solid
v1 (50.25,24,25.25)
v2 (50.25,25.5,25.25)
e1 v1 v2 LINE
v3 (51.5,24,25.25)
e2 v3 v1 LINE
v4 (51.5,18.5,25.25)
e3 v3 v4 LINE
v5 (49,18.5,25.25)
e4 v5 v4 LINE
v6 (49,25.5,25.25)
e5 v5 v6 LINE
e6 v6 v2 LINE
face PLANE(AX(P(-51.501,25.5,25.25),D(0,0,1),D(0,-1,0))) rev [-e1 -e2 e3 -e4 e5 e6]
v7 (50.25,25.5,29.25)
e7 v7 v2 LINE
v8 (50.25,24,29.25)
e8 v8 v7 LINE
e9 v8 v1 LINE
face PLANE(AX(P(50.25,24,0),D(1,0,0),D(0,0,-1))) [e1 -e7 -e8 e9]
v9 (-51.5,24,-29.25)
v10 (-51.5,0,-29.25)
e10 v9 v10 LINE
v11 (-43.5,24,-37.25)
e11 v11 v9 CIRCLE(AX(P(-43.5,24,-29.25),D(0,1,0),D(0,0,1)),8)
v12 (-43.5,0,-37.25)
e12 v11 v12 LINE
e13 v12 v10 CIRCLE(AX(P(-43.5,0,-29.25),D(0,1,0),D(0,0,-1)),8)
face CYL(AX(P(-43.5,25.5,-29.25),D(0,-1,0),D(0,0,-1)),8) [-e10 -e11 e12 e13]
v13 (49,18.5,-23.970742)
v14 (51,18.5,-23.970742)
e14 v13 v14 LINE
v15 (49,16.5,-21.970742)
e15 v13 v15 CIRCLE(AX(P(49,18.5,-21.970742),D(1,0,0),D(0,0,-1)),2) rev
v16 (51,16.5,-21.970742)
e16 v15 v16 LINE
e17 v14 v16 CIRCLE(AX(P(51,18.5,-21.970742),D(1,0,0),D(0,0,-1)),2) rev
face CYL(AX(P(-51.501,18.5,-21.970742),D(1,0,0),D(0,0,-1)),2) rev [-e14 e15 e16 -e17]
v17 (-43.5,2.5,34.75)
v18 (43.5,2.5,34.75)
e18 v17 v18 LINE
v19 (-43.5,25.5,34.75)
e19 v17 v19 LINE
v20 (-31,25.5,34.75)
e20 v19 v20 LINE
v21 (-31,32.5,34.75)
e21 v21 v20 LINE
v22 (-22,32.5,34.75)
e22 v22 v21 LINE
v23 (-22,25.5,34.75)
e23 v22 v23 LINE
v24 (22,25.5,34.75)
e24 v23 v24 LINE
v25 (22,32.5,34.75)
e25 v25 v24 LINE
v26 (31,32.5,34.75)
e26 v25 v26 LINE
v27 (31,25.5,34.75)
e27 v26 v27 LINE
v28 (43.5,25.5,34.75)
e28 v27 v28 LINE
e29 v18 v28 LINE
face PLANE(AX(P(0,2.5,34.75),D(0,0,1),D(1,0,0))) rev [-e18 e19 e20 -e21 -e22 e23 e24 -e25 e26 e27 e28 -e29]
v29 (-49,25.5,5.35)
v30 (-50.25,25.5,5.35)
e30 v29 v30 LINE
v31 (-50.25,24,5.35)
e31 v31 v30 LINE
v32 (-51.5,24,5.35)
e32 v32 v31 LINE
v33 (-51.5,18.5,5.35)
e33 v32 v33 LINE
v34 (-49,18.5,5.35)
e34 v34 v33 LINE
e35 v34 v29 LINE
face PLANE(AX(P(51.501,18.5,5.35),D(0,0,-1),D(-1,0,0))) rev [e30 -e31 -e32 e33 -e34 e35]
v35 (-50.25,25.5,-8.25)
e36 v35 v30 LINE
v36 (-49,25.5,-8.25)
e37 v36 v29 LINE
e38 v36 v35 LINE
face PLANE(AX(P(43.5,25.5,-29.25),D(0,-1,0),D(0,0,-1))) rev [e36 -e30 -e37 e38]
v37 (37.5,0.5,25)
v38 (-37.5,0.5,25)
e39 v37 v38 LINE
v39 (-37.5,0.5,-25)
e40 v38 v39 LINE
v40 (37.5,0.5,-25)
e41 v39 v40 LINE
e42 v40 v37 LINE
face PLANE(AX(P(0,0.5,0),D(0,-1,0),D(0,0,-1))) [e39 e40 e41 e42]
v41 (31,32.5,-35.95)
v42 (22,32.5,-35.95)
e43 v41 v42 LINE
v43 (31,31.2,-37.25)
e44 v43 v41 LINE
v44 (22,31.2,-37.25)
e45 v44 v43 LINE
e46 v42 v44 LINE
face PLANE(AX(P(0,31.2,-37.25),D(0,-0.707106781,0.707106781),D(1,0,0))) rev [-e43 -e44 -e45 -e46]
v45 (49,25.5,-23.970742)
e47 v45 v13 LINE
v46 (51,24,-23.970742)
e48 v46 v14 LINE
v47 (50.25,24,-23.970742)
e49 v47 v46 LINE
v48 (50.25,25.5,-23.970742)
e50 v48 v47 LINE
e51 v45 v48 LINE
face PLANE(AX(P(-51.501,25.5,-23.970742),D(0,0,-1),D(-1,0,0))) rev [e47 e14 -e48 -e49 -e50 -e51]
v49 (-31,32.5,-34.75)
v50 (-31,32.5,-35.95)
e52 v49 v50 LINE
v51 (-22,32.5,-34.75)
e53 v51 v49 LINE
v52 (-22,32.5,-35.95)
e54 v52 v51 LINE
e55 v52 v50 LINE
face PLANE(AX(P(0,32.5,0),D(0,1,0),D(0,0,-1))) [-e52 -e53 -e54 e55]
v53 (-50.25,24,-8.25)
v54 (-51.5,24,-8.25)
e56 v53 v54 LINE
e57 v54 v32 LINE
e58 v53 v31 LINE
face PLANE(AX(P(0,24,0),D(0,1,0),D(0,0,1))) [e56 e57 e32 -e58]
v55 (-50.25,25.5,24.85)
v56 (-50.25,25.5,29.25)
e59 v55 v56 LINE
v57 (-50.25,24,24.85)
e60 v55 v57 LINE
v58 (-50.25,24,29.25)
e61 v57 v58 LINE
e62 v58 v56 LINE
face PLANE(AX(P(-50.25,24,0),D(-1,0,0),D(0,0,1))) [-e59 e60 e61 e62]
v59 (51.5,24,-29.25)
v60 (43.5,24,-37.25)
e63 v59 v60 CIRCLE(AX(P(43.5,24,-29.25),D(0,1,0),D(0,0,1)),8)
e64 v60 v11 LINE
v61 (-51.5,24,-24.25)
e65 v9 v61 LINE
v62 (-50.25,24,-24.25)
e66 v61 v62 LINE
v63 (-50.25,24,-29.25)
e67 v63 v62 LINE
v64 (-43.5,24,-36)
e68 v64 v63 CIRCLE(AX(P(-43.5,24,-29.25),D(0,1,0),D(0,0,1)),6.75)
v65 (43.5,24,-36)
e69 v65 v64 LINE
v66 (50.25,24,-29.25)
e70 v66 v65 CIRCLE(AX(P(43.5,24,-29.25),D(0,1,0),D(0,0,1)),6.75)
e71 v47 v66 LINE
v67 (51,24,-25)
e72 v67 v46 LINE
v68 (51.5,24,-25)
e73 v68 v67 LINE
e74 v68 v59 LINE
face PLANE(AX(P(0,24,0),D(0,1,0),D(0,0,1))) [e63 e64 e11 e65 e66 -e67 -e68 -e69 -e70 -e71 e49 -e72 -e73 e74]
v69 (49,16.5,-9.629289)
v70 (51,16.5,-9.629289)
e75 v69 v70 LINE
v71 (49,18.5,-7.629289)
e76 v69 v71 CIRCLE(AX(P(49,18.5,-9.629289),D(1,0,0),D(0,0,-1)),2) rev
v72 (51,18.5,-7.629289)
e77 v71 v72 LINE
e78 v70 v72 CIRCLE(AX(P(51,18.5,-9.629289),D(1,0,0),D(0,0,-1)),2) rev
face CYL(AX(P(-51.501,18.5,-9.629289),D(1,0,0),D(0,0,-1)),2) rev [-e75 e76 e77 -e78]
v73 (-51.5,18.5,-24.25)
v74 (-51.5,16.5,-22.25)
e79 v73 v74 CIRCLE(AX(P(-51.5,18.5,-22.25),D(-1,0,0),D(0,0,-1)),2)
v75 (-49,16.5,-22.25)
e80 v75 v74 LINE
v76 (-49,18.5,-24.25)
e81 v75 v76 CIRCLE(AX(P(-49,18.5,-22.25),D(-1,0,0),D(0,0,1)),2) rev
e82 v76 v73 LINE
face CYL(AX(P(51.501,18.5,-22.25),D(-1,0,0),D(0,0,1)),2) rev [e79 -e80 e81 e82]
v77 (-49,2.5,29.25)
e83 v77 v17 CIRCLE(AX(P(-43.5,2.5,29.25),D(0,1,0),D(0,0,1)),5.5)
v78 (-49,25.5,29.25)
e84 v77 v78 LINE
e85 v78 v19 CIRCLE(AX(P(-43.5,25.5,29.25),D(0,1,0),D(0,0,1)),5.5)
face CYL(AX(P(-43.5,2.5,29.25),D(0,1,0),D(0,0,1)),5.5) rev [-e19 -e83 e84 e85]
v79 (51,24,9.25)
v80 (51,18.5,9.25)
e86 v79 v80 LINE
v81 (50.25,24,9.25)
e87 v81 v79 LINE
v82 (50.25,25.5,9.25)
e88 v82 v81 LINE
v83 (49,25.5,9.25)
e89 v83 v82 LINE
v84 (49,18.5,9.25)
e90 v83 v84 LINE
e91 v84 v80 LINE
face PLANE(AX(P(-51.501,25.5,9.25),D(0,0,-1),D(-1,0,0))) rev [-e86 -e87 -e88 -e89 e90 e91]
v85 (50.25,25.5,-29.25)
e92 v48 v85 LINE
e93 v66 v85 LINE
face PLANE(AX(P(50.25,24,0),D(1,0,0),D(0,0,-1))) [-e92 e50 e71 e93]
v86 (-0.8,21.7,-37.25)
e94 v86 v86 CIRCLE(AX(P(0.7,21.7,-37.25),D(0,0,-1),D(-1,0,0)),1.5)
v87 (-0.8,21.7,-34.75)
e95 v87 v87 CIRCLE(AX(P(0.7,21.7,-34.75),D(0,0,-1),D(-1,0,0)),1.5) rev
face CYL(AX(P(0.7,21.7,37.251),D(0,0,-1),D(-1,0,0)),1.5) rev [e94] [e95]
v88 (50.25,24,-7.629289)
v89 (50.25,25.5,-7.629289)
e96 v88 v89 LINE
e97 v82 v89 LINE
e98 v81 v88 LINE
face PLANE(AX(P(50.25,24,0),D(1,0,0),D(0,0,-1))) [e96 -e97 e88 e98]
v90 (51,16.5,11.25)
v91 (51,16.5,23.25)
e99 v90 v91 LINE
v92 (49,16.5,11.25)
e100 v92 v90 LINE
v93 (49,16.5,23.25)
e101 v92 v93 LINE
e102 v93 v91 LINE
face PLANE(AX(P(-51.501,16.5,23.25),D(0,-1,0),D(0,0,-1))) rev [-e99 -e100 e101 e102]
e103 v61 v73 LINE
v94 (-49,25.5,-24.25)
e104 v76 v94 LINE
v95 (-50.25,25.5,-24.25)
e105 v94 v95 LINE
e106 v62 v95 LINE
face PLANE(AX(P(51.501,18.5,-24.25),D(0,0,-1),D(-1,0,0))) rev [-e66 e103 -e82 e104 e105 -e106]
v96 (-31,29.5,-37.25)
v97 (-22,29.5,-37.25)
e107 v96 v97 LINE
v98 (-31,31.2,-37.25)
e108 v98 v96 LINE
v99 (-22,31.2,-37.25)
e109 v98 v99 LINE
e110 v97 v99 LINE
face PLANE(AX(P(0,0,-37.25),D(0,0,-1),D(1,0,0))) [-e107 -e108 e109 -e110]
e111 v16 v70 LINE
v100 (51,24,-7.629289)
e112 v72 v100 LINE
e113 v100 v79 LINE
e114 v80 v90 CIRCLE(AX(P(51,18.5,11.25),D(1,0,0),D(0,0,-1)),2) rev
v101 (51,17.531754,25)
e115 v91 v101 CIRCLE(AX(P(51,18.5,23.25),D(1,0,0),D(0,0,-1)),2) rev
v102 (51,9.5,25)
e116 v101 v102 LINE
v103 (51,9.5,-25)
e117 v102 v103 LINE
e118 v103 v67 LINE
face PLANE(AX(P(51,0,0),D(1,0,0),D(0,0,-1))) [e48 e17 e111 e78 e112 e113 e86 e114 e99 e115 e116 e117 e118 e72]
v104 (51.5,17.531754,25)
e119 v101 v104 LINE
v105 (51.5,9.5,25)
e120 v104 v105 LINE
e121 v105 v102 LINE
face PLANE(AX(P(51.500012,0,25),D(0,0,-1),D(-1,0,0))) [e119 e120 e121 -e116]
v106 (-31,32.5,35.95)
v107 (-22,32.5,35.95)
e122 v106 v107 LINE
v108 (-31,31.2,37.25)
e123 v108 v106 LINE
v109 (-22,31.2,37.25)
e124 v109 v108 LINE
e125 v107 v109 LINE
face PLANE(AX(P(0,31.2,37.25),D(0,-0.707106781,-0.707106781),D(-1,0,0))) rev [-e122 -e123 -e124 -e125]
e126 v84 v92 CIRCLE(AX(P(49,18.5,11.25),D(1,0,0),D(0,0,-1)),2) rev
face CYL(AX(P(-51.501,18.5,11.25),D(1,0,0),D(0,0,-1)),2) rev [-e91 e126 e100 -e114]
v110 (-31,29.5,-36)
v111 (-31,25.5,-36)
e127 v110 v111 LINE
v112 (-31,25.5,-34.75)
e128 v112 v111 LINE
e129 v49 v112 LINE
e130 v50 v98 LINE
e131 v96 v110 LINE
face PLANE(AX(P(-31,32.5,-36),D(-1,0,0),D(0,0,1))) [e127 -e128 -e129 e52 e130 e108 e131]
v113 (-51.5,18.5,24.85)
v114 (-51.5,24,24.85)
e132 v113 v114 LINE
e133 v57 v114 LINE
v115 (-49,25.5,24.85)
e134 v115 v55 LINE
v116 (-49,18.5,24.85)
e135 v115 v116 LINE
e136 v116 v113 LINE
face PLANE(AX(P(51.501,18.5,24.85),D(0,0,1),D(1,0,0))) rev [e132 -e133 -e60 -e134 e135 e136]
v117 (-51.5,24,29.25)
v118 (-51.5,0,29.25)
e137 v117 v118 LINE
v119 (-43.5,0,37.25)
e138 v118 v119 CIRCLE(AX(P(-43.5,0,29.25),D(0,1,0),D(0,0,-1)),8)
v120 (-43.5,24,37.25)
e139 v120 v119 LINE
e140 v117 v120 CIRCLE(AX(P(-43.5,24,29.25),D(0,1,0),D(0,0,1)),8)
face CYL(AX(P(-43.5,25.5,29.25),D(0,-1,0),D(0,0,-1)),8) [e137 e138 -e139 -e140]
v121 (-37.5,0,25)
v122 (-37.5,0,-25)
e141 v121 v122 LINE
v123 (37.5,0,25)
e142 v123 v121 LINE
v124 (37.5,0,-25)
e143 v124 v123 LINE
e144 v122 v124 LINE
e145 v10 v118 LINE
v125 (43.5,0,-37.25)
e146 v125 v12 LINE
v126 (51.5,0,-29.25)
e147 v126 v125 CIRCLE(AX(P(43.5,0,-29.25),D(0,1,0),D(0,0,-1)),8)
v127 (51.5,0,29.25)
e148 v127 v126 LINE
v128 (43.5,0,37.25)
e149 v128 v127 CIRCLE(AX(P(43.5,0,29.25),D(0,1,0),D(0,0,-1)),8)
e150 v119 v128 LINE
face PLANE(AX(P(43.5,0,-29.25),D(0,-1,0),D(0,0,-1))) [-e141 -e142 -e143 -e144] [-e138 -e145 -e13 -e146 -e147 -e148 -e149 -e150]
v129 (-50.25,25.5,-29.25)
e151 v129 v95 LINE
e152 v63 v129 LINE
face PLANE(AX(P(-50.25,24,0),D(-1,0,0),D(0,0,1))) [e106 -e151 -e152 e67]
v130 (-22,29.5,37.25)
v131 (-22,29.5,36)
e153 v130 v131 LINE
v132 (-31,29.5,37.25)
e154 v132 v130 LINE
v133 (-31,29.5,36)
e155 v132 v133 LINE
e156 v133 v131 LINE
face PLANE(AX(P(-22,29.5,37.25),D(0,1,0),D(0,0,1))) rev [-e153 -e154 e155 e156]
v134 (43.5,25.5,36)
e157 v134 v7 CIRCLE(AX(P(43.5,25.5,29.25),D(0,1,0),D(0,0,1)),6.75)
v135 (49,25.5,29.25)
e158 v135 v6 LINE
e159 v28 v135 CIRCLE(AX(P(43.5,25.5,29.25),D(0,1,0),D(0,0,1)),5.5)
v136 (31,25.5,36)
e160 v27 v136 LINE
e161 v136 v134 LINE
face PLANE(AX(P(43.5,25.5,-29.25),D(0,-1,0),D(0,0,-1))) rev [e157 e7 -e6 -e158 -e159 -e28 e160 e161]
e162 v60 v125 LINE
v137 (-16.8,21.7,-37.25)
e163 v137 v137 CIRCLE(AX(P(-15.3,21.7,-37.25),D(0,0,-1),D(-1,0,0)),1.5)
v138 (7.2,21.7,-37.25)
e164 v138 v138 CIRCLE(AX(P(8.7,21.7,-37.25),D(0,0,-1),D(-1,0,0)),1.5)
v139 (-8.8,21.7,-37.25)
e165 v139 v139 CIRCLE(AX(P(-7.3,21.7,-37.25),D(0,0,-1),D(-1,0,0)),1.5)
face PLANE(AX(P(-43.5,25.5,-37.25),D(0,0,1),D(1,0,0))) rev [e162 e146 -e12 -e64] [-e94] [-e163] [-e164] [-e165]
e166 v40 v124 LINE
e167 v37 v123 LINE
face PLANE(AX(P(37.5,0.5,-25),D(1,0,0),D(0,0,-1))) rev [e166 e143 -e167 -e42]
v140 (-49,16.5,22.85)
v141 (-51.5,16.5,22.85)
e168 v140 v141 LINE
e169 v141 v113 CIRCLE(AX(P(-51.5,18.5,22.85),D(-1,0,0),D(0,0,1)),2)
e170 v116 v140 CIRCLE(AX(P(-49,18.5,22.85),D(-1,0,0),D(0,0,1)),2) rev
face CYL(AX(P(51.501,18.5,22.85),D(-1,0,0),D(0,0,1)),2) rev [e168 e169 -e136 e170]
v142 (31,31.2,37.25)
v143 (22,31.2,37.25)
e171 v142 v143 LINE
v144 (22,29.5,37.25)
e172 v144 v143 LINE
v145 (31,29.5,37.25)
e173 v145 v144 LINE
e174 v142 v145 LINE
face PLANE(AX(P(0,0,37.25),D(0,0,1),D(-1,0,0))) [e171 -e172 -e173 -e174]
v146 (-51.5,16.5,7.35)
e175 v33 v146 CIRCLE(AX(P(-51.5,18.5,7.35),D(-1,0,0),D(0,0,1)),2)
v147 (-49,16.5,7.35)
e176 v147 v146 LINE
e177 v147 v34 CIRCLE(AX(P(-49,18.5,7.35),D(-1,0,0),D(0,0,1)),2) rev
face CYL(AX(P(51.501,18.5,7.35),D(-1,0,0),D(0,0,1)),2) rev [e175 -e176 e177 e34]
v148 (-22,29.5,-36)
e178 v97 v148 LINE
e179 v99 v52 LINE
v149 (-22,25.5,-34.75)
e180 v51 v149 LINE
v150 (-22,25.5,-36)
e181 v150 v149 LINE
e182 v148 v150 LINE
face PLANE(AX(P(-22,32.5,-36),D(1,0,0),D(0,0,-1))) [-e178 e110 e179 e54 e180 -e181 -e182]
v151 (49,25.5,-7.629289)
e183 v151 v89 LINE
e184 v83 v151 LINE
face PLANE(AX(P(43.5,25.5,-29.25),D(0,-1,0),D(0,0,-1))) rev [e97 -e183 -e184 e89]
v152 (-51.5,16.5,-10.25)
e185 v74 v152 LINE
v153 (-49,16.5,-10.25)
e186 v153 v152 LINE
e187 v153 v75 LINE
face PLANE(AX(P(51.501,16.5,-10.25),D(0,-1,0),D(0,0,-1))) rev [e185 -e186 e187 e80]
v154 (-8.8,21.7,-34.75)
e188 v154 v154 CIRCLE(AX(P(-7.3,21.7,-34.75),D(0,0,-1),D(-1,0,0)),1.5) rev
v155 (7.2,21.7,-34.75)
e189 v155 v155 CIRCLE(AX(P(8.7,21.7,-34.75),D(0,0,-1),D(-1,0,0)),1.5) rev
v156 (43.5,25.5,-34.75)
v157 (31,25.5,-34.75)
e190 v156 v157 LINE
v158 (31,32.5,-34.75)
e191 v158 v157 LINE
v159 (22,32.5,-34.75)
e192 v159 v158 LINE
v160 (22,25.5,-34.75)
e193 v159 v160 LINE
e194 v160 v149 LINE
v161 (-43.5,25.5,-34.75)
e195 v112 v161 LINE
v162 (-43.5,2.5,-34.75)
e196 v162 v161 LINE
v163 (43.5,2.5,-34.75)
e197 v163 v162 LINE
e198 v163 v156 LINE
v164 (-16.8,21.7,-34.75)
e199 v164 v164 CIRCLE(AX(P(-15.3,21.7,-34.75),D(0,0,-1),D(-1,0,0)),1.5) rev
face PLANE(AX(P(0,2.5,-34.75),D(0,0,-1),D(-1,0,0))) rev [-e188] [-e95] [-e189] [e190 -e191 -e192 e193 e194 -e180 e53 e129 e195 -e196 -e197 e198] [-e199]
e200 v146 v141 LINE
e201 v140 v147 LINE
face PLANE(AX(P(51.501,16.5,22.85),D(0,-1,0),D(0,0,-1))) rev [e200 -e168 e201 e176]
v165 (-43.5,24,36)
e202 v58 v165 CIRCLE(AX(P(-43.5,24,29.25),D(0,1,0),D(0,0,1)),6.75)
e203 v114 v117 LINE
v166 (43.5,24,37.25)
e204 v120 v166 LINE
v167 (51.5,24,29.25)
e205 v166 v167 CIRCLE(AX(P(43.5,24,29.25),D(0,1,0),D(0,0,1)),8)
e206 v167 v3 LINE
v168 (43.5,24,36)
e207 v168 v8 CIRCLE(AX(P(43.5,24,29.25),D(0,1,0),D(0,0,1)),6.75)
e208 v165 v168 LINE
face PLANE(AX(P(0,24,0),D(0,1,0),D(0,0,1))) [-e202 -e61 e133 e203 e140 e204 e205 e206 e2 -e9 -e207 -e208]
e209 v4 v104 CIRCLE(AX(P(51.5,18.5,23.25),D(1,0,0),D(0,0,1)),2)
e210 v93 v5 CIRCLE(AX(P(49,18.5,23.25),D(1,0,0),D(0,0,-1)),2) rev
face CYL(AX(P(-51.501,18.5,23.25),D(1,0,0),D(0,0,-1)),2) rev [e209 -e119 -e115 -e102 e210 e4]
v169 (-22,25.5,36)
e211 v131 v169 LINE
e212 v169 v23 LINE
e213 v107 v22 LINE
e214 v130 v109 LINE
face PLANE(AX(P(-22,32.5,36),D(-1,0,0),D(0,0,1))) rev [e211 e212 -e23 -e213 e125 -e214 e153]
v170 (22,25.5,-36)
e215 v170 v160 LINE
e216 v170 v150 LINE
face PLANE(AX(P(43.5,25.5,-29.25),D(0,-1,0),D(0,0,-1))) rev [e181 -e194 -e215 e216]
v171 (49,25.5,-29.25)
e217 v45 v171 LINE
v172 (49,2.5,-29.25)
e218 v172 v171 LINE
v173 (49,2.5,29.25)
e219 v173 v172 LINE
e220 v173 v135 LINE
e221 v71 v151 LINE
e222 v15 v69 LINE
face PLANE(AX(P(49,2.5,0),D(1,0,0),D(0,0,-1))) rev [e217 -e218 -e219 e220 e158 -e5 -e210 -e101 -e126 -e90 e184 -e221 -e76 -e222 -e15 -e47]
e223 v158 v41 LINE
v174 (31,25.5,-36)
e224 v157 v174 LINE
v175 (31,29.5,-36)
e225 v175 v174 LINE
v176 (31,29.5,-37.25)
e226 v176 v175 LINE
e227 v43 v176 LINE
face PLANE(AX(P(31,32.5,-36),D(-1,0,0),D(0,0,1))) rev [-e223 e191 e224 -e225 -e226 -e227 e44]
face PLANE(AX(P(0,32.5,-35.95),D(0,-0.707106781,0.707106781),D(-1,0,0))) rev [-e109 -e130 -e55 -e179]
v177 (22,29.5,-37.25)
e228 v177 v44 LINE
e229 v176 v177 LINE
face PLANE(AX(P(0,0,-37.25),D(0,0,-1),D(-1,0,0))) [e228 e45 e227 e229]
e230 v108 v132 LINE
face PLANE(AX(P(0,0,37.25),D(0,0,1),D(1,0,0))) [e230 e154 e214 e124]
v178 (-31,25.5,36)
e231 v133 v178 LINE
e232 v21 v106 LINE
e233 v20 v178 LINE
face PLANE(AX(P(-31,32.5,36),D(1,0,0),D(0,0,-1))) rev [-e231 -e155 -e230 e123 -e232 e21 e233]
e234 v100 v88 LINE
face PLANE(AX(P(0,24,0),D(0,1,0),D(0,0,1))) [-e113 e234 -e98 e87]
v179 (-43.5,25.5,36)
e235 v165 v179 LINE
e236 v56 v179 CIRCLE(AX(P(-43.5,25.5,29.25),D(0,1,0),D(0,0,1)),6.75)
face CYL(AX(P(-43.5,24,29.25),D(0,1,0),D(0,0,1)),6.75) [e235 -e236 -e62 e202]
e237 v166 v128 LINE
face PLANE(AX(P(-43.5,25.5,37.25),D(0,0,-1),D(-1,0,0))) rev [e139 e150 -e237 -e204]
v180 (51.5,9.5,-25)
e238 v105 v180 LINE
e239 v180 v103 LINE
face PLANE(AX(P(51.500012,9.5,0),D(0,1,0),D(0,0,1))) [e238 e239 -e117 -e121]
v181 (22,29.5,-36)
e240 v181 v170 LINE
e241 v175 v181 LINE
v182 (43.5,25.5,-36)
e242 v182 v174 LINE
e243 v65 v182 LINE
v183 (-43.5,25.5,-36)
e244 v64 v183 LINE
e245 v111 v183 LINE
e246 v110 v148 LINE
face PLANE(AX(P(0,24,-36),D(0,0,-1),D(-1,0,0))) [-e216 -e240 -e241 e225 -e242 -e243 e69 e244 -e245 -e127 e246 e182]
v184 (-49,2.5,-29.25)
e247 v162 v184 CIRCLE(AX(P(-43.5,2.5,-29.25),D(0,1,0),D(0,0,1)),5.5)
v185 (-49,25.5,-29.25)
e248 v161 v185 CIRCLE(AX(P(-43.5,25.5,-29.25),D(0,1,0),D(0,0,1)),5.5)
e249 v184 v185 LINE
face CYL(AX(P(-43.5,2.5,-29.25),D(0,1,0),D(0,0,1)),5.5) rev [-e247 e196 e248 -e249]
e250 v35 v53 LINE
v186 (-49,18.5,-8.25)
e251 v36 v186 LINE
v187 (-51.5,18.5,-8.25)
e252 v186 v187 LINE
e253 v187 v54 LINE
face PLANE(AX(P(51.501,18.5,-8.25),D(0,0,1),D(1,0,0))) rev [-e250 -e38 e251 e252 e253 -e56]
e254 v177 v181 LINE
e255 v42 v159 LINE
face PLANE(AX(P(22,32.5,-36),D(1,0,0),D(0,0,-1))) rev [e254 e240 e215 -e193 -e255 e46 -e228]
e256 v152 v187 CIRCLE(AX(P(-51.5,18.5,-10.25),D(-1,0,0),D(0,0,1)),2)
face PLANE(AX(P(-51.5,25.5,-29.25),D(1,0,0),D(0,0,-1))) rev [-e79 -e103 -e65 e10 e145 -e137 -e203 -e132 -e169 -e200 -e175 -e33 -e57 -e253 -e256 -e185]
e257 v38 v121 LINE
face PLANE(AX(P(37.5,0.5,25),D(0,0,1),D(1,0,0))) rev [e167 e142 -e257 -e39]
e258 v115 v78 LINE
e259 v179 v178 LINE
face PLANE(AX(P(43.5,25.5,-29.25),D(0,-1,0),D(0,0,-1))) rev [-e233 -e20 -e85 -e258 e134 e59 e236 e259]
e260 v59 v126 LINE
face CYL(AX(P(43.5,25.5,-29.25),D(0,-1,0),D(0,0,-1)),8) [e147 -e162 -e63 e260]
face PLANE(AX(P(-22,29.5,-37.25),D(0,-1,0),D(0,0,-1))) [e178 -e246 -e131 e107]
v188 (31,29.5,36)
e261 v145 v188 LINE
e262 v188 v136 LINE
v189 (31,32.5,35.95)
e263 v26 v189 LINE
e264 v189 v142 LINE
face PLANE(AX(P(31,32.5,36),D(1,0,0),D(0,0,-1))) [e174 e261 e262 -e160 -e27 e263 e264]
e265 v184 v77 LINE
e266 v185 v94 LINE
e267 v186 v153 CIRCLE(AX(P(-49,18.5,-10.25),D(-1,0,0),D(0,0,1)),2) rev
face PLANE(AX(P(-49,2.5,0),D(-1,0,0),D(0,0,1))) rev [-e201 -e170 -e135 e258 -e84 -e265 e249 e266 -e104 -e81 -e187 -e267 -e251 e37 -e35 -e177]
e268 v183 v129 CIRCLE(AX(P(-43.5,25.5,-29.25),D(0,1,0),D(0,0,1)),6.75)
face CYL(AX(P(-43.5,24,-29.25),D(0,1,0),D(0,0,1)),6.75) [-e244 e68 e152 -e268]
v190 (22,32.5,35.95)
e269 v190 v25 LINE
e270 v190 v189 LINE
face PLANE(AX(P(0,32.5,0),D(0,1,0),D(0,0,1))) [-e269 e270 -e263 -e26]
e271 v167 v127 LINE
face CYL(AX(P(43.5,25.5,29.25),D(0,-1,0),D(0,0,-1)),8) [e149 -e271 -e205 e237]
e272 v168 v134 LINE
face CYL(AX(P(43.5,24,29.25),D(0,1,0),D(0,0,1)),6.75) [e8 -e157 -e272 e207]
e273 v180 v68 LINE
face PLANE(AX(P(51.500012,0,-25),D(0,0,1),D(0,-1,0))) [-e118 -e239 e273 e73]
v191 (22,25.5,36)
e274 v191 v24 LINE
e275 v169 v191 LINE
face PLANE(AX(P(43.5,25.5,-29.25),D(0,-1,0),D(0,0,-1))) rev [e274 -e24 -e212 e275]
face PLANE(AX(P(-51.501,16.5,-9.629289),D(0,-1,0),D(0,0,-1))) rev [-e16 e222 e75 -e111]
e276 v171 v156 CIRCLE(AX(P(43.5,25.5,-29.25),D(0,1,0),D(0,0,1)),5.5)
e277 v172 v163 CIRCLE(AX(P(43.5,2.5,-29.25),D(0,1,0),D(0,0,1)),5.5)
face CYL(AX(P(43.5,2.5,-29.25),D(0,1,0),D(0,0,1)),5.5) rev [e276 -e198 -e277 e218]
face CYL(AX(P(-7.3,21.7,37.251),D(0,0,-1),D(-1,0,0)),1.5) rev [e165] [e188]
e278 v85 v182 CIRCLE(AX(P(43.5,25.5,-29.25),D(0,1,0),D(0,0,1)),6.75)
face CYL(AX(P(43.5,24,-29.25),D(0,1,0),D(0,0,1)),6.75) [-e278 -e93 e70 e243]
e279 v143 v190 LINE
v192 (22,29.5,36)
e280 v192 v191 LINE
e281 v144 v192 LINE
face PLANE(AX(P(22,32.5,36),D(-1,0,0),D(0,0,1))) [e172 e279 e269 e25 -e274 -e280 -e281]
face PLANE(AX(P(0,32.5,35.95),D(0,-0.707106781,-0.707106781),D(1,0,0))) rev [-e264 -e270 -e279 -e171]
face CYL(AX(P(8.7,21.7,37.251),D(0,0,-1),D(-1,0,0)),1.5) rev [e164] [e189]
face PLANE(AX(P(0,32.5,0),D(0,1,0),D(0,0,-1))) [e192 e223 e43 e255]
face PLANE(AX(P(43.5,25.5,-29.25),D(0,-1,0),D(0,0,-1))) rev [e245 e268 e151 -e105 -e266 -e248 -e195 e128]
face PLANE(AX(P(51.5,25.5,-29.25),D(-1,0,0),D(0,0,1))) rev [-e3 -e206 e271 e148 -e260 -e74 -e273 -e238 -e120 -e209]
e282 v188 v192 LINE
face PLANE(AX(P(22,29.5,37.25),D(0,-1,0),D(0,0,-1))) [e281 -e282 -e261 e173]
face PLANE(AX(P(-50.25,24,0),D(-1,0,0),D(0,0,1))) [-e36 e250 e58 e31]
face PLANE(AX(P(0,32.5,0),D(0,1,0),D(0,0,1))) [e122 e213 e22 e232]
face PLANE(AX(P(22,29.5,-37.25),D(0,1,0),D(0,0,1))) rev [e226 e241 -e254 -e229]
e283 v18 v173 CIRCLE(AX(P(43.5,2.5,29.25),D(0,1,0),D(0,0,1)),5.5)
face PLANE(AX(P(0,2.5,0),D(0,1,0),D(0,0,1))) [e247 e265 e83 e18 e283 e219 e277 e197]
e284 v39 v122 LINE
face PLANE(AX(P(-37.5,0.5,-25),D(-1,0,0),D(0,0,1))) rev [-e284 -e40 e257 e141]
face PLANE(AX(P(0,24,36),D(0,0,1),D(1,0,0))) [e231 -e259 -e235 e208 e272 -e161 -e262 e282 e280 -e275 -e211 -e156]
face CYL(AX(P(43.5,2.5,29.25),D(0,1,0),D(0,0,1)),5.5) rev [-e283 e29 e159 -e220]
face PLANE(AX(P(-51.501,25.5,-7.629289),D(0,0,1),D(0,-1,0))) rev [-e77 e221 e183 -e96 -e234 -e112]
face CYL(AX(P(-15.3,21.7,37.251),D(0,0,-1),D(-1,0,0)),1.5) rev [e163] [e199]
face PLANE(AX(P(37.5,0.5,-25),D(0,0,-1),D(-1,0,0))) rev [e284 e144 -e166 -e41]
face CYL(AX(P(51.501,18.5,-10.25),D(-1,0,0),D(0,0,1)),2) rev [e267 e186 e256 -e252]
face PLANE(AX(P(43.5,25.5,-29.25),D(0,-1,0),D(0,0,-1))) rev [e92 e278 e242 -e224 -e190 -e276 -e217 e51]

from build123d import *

# Parameters (mm, degrees)
EXTRUDE_1_DEPTH            = 25.5
CUT_EXTRUDE_1_DEPTH        = 23
CUT_EXTRUDE_START          = -1.5
CUT_EXTRUDE_2_DEPTH        = 1.5
SKETCH_3_W                 = 9
SKETCH_3_H                 = 1.25
EXTRUDE_2_DEPTH            = 7
SKETCH_4_W                 = 9
SKETCH_4_H                 = 3
EXTRUDE_3_DEPTH            = 1.25
CHAMFER_1_SIZE             = 1.3
CHAMFER_1_OF_MIRROR_1_SIZE = 1.3
MIRROR_START               = -31
MIRROR_4_DEPTH             = 9
MIRROR_START_2             = 22
MIRROR_4_2_DEPTH           = 9
SKETCH_5_W                 = 75
SKETCH_5_H                 = 50
CUT_EXTRUDE_3_DEPTH        = 0.5
CUT_EXTRUDE_4_DEPTH        = 115.248905903
CUT_EXTRUDE_4_DEPTH_BACK   = 0.5
SKETCH_6_W                 = 50
SKETCH_6_H                 = 14.5
CUT_EXTRUDE_5_REACH        = 98.222
SKETCH_7_R                 = 1.5
CUT_EXTRUDE_6_REACH        = 116.249
CUT_EXTRUDE_7_REACH        = 116.249


# Read off the part's stored shape, not the designer's step: Зеркальное отражение4
with BuildPart() as part:
    # Эскиз1 → Бобышка-Вытянуть1 (new body)
    with BuildSketch(Plane(origin=(0, 0, 0), x_dir=(1, 0, 0), z_dir=(0, 1, 0))):
        with BuildLine():
            Line((-43.5, 37.25), (43.5, 37.25))
            ThreePointArc((43.5, 37.25), (49.156854249, 34.906854249), (51.5, 29.25))
            Line((51.5, 29.25), (51.5, -29.25))
            ThreePointArc((51.5, -29.25), (49.156854249, -34.906854249), (43.5, -37.25))
            Line((43.5, -37.25), (-43.5, -37.25))
            ThreePointArc((-43.5, -37.25), (-49.156854249, -34.906854249), (-51.5, -29.25))
            Line((-51.5, -29.25), (-51.5, 29.25))
            ThreePointArc((-51.5, 29.25), (-49.156854249, 34.906854249), (-43.5, 37.25))
        make_face()
    extrude(amount=EXTRUDE_1_DEPTH)

    # Эскиз2 → Вырез-Вытянуть1 (cut)
    with BuildSketch(Plane(origin=(0, 25.5, 0), x_dir=(1, 0, 0), z_dir=(0, 1, 0))):
        with BuildLine():
            Line((-49, 29.25), (-49, -29.25))
            ThreePointArc((-49, -29.25), (-47.389087297, -33.139087297), (-43.5, -34.75))
            Line((-43.5, -34.75), (43.5, -34.75))
            ThreePointArc((43.5, -34.75), (47.389087297, -33.139087297), (49, -29.25))
            Line((49, -29.25), (49, 29.25))
            ThreePointArc((49, 29.25), (47.389087297, 33.139087297), (43.5, 34.75))
            Line((43.5, 34.75), (-43.5, 34.75))
            ThreePointArc((-43.5, 34.75), (-47.389087297, 33.139087297), (-49, 29.25))
        make_face()
    extrude(amount=-CUT_EXTRUDE_1_DEPTH, mode=Mode.SUBTRACT)

    # Эскиз2<3> → Вырез-Вытянуть2 (cut)
    with BuildSketch(Plane(origin=(0, 25.5, 0), x_dir=(1, 0, 0), z_dir=(0, 1, 0)).offset(CUT_EXTRUDE_START)):
        with BuildLine():
            Line((51.5, -29.25), (51.5, 29.25))
            ThreePointArc((51.5, 29.25), (49.156854249, 34.906854249), (43.5, 37.25))
            Line((43.5, 37.25), (-43.5, 37.25))
            ThreePointArc((-43.5, 37.25), (-49.156854249, 34.906854249), (-51.5, 29.25))
            Line((-51.5, 29.25), (-51.5, -29.25))
            ThreePointArc((-51.5, -29.25), (-49.156854249, -34.906854249), (-43.5, -37.25))
            Line((-43.5, -37.25), (43.5, -37.25))
            ThreePointArc((43.5, -37.25), (49.156854249, -34.906854249), (51.5, -29.25))
        make_face()
        with BuildLine():
            ThreePointArc((43.5, -36), (48.272970773, -34.022970773), (50.25, -29.25))
            Line((50.25, -29.25), (50.25, 29.25))
            ThreePointArc((50.25, 29.25), (48.272970773, 34.022970773), (43.5, 36))
            Line((43.5, 36), (-43.5, 36))
            ThreePointArc((-43.5, 36), (-48.272970773, 34.022970773), (-50.25, 29.25))
            Line((-50.25, 29.25), (-50.25, -29.25))
            ThreePointArc((-50.25, -29.25), (-48.272970773, -34.022970773), (-43.5, -36))
            Line((-43.5, -36), (43.5, -36))
        make_face(mode=Mode.SUBTRACT)
    extrude(amount=CUT_EXTRUDE_2_DEPTH, mode=Mode.SUBTRACT)

    # Эскиз3 → Бобышка-Вытянуть2 (add)
    with BuildSketch(Plane(origin=(0, 25.5, 0), x_dir=(1, 0, 0), z_dir=(0, 1, 0))):
        with Locations((-26.5, -35.375)):
            Rectangle(SKETCH_3_W, SKETCH_3_H)
    extrude_2 = extrude(amount=EXTRUDE_2_DEPTH)

    # Эскиз4 → Бобышка-Вытянуть3 (add, through all)
    with BuildSketch(Plane.XY.offset(36)):
        with Locations((-26.5, 31)):
            Rectangle(SKETCH_4_W, SKETCH_4_H)
    extrude_3 = extrude(amount=EXTRUDE_3_DEPTH)

    # Фаска1
    chamfer_1_edges = [part.edges().sort_by_distance(p)[0] for p in [
        (-26.5, 32.5, 37.25),
    ]]
    chamfer(chamfer_1_edges, length=CHAMFER_1_SIZE)

    # Зеркальное отражение1: Бобышка-Вытянуть2, Бобышка-Вытянуть3 across plane
    add(extrude_2.mirror(Plane(origin=(0, 0, 0), x_dir=(0, 0, 1), z_dir=(1, 0, 0))))
    add(extrude_3.mirror(Plane(origin=(0, 0, 0), x_dir=(0, 0, 1), z_dir=(1, 0, 0))))

    # Фаска1 of Зеркальное отражение1
    chamfer_1_of_mirror_1_edges = [part.edges().sort_by_distance(p)[0] for p in [
        (26.5, 32.5, 37.25),
    ]]
    chamfer(chamfer_1_of_mirror_1_edges, length=CHAMFER_1_OF_MIRROR_1_SIZE)

    # Зеркальное отражение4 outline → Зеркальное отражение4 (add)
    with BuildSketch(Plane.YZ.offset(MIRROR_START)):
        Polygon((25.5, -34.75), (25.5, -36), (29.5, -36), (29.5, -37.25), (31.2, -37.25), (32.5, -35.95), (32.5, -34.75), align=None)
    extrude(amount=MIRROR_4_DEPTH)

    # Mirror 4 2 outline → Mirror 4 2 (add)
    with BuildSketch(Plane.YZ.offset(MIRROR_START_2)):
        Polygon((25.5, -34.75), (25.5, -36), (29.5, -36), (29.5, -37.25), (31.2, -37.25), (32.5, -35.95), (32.5, -34.75), align=None)
    extrude(amount=MIRROR_4_2_DEPTH)

    # Эскиз5 → Вырез-Вытянуть3 (cut)
    with BuildSketch(Plane.XZ):
        Rectangle(SKETCH_5_W, SKETCH_5_H)
    extrude(amount=-CUT_EXTRUDE_3_DEPTH, mode=Mode.SUBTRACT)

    # Эскиз6 → Вырез-Вытянуть4 (cut, two sides: drawn at the far end of the back side and taken through both)
    with BuildSketch(Plane(origin=(51.5, 0, 0), x_dir=(0, 0, -1), z_dir=(1, 0, 0)).offset(-CUT_EXTRUDE_4_DEPTH_BACK)):
        with Locations((0, 16.75)):
            Rectangle(SKETCH_6_W, SKETCH_6_H)
    extrude(amount=CUT_EXTRUDE_4_DEPTH + CUT_EXTRUDE_4_DEPTH_BACK, mode=Mode.SUBTRACT)

    # Эскиз7 → Вырез-Вытянуть5 (cut, up to next)
    with BuildSketch(Plane(origin=(0, 0, -37.25), x_dir=(-1, 0, 0), z_dir=(0, 0, -1)), mode=Mode.PRIVATE) as cut_extrude_5_sk1:
        with Locations((15.3, 21.7)):
            Circle(SKETCH_7_R)
    cut_extrude_5_tool1 = extrude(cut_extrude_5_sk1.sketch, amount=-CUT_EXTRUDE_5_REACH, mode=Mode.PRIVATE) & part.part
    # Эскиз7 → Вырез-Вытянуть5 (cut, up to next)
    with BuildSketch(Plane(origin=(0, 0, -37.25), x_dir=(-1, 0, 0), z_dir=(0, 0, -1)), mode=Mode.PRIVATE) as cut_extrude_5_sk2:
        with Locations((7.3, 21.7)):
            Circle(SKETCH_7_R)
    cut_extrude_5_tool2 = extrude(cut_extrude_5_sk2.sketch, amount=-CUT_EXTRUDE_5_REACH, mode=Mode.PRIVATE) & part.part
    # Эскиз7 → Вырез-Вытянуть5 (cut, up to next)
    with BuildSketch(Plane(origin=(0, 0, -37.25), x_dir=(-1, 0, 0), z_dir=(0, 0, -1)), mode=Mode.PRIVATE) as cut_extrude_5_sk3:
        with Locations((-0.7, 21.7)):
            Circle(SKETCH_7_R)
    cut_extrude_5_tool3 = extrude(cut_extrude_5_sk3.sketch, amount=-CUT_EXTRUDE_5_REACH, mode=Mode.PRIVATE) & part.part
    # Эскиз7 → Вырез-Вытянуть5 (cut, up to next)
    with BuildSketch(Plane(origin=(0, 0, -37.25), x_dir=(-1, 0, 0), z_dir=(0, 0, -1)), mode=Mode.PRIVATE) as cut_extrude_5_sk4:
        with Locations((-8.7, 21.7)):
            Circle(SKETCH_7_R)
    cut_extrude_5_tool4 = extrude(cut_extrude_5_sk4.sketch, amount=-CUT_EXTRUDE_5_REACH, mode=Mode.PRIVATE) & part.part
    add(cut_extrude_5_tool1.solids().sort_by_distance((-15.3, 21.7, -37.25))[0], mode=Mode.SUBTRACT)
    add(cut_extrude_5_tool2.solids().sort_by_distance((-7.3, 21.7, -37.25))[0], mode=Mode.SUBTRACT)
    add(cut_extrude_5_tool3.solids().sort_by_distance((0.7, 21.7, -37.25))[0], mode=Mode.SUBTRACT)
    add(cut_extrude_5_tool4.solids().sort_by_distance((8.7, 21.7, -37.25))[0], mode=Mode.SUBTRACT)

    # Эскиз8 → Вырез-Вытянуть6 (cut, up to next)
    with BuildSketch(Plane.ZY.offset(51.5), mode=Mode.PRIVATE) as cut_extrude_6_sk1:
        with BuildLine():
            Line((-10.25, 16.5), (-22.25, 16.5))
            ThreePointArc((-22.25, 16.5), (-23.664213562, 17.085786438), (-24.25, 18.5))
            Line((-24.25, 18.5), (-24.25, 25.5))
            Line((-24.25, 25.5), (-8.25, 25.5))
            Line((-8.25, 25.5), (-8.25, 18.5))
            ThreePointArc((-8.25, 18.5), (-8.835786438, 17.085786438), (-10.25, 16.5))
        make_face()
    cut_extrude_6_tool1 = extrude(cut_extrude_6_sk1.sketch, amount=-CUT_EXTRUDE_6_REACH, mode=Mode.PRIVATE) & part.part
    # Эскиз8 → Вырез-Вытянуть6 (cut, up to next)
    with BuildSketch(Plane.ZY.offset(51.5), mode=Mode.PRIVATE) as cut_extrude_6_sk2:
        with BuildLine():
            Line((22.85, 16.5), (7.35, 16.5))
            ThreePointArc((7.35, 16.5), (5.935786438, 17.085786438), (5.35, 18.5))
            Line((5.35, 18.5), (5.35, 25.5))
            Line((5.35, 25.5), (24.85, 25.5))
            Line((24.85, 25.5), (24.85, 18.5))
            ThreePointArc((24.85, 18.5), (24.264213562, 17.085786438), (22.85, 16.5))
        make_face()
    cut_extrude_6_tool2 = extrude(cut_extrude_6_sk2.sketch, amount=-CUT_EXTRUDE_6_REACH, mode=Mode.PRIVATE) & part.part
    add(cut_extrude_6_tool1.solids().sort_by_distance((-51.5, 21.048907, -16.25))[0], mode=Mode.SUBTRACT)
    add(cut_extrude_6_tool2.solids().sort_by_distance((-51.5, 21.040042, 15.1))[0], mode=Mode.SUBTRACT)

    # Эскиз9 → Вырез-Вытянуть7 (cut, up to next)
    with BuildSketch(Plane(origin=(51.5, 0, 0), x_dir=(0, 0, -1), z_dir=(1, 0, 0)), mode=Mode.PRIVATE) as cut_extrude_7_sk1:
        with BuildLine():
            Line((-25.25, 25.5), (-9.25, 25.5))
            Line((-9.25, 25.5), (-9.25, 18.5))
            ThreePointArc((-9.25, 18.5), (-9.835786438, 17.085786438), (-11.25, 16.5))
            Line((-11.25, 16.5), (-23.25, 16.5))
            ThreePointArc((-23.25, 16.5), (-24.664213562, 17.085786438), (-25.25, 18.5))
            Line((-25.25, 18.5), (-25.25, 25.5))
        make_face()
    cut_extrude_7_tool1 = extrude(cut_extrude_7_sk1.sketch, amount=-CUT_EXTRUDE_7_REACH, mode=Mode.PRIVATE) & part.part
    # Эскиз9 → Вырез-Вытянуть7 (cut, up to next)
    with BuildSketch(Plane(origin=(51.5, 0, 0), x_dir=(0, 0, -1), z_dir=(1, 0, 0)), mode=Mode.PRIVATE) as cut_extrude_7_sk2:
        with BuildLine():
            Line((7.629289035, 25.5), (23.970741735, 25.5))
            Line((23.970741735, 25.5), (23.970741735, 18.5))
            ThreePointArc((23.970741735, 18.5), (23.384955297, 17.085786438), (21.970741735, 16.5))
            Line((21.970741735, 16.5), (9.629289035, 16.5))
            ThreePointArc((9.629289035, 16.5), (8.215075473, 17.085786438), (7.629289035, 18.5))
            Line((7.629289035, 18.5), (7.629289035, 25.5))
        make_face()
    cut_extrude_7_tool2 = extrude(cut_extrude_7_sk2.sketch, amount=-CUT_EXTRUDE_7_REACH, mode=Mode.PRIVATE) & part.part
    add(cut_extrude_7_tool1.solids().sort_by_distance((51.5, 21.048907, 17.25))[0], mode=Mode.SUBTRACT)
    add(cut_extrude_7_tool2.solids().sort_by_distance((51.5, 21.047873, -15.800015))[0], mode=Mode.SUBTRACT)


solid = part.part
